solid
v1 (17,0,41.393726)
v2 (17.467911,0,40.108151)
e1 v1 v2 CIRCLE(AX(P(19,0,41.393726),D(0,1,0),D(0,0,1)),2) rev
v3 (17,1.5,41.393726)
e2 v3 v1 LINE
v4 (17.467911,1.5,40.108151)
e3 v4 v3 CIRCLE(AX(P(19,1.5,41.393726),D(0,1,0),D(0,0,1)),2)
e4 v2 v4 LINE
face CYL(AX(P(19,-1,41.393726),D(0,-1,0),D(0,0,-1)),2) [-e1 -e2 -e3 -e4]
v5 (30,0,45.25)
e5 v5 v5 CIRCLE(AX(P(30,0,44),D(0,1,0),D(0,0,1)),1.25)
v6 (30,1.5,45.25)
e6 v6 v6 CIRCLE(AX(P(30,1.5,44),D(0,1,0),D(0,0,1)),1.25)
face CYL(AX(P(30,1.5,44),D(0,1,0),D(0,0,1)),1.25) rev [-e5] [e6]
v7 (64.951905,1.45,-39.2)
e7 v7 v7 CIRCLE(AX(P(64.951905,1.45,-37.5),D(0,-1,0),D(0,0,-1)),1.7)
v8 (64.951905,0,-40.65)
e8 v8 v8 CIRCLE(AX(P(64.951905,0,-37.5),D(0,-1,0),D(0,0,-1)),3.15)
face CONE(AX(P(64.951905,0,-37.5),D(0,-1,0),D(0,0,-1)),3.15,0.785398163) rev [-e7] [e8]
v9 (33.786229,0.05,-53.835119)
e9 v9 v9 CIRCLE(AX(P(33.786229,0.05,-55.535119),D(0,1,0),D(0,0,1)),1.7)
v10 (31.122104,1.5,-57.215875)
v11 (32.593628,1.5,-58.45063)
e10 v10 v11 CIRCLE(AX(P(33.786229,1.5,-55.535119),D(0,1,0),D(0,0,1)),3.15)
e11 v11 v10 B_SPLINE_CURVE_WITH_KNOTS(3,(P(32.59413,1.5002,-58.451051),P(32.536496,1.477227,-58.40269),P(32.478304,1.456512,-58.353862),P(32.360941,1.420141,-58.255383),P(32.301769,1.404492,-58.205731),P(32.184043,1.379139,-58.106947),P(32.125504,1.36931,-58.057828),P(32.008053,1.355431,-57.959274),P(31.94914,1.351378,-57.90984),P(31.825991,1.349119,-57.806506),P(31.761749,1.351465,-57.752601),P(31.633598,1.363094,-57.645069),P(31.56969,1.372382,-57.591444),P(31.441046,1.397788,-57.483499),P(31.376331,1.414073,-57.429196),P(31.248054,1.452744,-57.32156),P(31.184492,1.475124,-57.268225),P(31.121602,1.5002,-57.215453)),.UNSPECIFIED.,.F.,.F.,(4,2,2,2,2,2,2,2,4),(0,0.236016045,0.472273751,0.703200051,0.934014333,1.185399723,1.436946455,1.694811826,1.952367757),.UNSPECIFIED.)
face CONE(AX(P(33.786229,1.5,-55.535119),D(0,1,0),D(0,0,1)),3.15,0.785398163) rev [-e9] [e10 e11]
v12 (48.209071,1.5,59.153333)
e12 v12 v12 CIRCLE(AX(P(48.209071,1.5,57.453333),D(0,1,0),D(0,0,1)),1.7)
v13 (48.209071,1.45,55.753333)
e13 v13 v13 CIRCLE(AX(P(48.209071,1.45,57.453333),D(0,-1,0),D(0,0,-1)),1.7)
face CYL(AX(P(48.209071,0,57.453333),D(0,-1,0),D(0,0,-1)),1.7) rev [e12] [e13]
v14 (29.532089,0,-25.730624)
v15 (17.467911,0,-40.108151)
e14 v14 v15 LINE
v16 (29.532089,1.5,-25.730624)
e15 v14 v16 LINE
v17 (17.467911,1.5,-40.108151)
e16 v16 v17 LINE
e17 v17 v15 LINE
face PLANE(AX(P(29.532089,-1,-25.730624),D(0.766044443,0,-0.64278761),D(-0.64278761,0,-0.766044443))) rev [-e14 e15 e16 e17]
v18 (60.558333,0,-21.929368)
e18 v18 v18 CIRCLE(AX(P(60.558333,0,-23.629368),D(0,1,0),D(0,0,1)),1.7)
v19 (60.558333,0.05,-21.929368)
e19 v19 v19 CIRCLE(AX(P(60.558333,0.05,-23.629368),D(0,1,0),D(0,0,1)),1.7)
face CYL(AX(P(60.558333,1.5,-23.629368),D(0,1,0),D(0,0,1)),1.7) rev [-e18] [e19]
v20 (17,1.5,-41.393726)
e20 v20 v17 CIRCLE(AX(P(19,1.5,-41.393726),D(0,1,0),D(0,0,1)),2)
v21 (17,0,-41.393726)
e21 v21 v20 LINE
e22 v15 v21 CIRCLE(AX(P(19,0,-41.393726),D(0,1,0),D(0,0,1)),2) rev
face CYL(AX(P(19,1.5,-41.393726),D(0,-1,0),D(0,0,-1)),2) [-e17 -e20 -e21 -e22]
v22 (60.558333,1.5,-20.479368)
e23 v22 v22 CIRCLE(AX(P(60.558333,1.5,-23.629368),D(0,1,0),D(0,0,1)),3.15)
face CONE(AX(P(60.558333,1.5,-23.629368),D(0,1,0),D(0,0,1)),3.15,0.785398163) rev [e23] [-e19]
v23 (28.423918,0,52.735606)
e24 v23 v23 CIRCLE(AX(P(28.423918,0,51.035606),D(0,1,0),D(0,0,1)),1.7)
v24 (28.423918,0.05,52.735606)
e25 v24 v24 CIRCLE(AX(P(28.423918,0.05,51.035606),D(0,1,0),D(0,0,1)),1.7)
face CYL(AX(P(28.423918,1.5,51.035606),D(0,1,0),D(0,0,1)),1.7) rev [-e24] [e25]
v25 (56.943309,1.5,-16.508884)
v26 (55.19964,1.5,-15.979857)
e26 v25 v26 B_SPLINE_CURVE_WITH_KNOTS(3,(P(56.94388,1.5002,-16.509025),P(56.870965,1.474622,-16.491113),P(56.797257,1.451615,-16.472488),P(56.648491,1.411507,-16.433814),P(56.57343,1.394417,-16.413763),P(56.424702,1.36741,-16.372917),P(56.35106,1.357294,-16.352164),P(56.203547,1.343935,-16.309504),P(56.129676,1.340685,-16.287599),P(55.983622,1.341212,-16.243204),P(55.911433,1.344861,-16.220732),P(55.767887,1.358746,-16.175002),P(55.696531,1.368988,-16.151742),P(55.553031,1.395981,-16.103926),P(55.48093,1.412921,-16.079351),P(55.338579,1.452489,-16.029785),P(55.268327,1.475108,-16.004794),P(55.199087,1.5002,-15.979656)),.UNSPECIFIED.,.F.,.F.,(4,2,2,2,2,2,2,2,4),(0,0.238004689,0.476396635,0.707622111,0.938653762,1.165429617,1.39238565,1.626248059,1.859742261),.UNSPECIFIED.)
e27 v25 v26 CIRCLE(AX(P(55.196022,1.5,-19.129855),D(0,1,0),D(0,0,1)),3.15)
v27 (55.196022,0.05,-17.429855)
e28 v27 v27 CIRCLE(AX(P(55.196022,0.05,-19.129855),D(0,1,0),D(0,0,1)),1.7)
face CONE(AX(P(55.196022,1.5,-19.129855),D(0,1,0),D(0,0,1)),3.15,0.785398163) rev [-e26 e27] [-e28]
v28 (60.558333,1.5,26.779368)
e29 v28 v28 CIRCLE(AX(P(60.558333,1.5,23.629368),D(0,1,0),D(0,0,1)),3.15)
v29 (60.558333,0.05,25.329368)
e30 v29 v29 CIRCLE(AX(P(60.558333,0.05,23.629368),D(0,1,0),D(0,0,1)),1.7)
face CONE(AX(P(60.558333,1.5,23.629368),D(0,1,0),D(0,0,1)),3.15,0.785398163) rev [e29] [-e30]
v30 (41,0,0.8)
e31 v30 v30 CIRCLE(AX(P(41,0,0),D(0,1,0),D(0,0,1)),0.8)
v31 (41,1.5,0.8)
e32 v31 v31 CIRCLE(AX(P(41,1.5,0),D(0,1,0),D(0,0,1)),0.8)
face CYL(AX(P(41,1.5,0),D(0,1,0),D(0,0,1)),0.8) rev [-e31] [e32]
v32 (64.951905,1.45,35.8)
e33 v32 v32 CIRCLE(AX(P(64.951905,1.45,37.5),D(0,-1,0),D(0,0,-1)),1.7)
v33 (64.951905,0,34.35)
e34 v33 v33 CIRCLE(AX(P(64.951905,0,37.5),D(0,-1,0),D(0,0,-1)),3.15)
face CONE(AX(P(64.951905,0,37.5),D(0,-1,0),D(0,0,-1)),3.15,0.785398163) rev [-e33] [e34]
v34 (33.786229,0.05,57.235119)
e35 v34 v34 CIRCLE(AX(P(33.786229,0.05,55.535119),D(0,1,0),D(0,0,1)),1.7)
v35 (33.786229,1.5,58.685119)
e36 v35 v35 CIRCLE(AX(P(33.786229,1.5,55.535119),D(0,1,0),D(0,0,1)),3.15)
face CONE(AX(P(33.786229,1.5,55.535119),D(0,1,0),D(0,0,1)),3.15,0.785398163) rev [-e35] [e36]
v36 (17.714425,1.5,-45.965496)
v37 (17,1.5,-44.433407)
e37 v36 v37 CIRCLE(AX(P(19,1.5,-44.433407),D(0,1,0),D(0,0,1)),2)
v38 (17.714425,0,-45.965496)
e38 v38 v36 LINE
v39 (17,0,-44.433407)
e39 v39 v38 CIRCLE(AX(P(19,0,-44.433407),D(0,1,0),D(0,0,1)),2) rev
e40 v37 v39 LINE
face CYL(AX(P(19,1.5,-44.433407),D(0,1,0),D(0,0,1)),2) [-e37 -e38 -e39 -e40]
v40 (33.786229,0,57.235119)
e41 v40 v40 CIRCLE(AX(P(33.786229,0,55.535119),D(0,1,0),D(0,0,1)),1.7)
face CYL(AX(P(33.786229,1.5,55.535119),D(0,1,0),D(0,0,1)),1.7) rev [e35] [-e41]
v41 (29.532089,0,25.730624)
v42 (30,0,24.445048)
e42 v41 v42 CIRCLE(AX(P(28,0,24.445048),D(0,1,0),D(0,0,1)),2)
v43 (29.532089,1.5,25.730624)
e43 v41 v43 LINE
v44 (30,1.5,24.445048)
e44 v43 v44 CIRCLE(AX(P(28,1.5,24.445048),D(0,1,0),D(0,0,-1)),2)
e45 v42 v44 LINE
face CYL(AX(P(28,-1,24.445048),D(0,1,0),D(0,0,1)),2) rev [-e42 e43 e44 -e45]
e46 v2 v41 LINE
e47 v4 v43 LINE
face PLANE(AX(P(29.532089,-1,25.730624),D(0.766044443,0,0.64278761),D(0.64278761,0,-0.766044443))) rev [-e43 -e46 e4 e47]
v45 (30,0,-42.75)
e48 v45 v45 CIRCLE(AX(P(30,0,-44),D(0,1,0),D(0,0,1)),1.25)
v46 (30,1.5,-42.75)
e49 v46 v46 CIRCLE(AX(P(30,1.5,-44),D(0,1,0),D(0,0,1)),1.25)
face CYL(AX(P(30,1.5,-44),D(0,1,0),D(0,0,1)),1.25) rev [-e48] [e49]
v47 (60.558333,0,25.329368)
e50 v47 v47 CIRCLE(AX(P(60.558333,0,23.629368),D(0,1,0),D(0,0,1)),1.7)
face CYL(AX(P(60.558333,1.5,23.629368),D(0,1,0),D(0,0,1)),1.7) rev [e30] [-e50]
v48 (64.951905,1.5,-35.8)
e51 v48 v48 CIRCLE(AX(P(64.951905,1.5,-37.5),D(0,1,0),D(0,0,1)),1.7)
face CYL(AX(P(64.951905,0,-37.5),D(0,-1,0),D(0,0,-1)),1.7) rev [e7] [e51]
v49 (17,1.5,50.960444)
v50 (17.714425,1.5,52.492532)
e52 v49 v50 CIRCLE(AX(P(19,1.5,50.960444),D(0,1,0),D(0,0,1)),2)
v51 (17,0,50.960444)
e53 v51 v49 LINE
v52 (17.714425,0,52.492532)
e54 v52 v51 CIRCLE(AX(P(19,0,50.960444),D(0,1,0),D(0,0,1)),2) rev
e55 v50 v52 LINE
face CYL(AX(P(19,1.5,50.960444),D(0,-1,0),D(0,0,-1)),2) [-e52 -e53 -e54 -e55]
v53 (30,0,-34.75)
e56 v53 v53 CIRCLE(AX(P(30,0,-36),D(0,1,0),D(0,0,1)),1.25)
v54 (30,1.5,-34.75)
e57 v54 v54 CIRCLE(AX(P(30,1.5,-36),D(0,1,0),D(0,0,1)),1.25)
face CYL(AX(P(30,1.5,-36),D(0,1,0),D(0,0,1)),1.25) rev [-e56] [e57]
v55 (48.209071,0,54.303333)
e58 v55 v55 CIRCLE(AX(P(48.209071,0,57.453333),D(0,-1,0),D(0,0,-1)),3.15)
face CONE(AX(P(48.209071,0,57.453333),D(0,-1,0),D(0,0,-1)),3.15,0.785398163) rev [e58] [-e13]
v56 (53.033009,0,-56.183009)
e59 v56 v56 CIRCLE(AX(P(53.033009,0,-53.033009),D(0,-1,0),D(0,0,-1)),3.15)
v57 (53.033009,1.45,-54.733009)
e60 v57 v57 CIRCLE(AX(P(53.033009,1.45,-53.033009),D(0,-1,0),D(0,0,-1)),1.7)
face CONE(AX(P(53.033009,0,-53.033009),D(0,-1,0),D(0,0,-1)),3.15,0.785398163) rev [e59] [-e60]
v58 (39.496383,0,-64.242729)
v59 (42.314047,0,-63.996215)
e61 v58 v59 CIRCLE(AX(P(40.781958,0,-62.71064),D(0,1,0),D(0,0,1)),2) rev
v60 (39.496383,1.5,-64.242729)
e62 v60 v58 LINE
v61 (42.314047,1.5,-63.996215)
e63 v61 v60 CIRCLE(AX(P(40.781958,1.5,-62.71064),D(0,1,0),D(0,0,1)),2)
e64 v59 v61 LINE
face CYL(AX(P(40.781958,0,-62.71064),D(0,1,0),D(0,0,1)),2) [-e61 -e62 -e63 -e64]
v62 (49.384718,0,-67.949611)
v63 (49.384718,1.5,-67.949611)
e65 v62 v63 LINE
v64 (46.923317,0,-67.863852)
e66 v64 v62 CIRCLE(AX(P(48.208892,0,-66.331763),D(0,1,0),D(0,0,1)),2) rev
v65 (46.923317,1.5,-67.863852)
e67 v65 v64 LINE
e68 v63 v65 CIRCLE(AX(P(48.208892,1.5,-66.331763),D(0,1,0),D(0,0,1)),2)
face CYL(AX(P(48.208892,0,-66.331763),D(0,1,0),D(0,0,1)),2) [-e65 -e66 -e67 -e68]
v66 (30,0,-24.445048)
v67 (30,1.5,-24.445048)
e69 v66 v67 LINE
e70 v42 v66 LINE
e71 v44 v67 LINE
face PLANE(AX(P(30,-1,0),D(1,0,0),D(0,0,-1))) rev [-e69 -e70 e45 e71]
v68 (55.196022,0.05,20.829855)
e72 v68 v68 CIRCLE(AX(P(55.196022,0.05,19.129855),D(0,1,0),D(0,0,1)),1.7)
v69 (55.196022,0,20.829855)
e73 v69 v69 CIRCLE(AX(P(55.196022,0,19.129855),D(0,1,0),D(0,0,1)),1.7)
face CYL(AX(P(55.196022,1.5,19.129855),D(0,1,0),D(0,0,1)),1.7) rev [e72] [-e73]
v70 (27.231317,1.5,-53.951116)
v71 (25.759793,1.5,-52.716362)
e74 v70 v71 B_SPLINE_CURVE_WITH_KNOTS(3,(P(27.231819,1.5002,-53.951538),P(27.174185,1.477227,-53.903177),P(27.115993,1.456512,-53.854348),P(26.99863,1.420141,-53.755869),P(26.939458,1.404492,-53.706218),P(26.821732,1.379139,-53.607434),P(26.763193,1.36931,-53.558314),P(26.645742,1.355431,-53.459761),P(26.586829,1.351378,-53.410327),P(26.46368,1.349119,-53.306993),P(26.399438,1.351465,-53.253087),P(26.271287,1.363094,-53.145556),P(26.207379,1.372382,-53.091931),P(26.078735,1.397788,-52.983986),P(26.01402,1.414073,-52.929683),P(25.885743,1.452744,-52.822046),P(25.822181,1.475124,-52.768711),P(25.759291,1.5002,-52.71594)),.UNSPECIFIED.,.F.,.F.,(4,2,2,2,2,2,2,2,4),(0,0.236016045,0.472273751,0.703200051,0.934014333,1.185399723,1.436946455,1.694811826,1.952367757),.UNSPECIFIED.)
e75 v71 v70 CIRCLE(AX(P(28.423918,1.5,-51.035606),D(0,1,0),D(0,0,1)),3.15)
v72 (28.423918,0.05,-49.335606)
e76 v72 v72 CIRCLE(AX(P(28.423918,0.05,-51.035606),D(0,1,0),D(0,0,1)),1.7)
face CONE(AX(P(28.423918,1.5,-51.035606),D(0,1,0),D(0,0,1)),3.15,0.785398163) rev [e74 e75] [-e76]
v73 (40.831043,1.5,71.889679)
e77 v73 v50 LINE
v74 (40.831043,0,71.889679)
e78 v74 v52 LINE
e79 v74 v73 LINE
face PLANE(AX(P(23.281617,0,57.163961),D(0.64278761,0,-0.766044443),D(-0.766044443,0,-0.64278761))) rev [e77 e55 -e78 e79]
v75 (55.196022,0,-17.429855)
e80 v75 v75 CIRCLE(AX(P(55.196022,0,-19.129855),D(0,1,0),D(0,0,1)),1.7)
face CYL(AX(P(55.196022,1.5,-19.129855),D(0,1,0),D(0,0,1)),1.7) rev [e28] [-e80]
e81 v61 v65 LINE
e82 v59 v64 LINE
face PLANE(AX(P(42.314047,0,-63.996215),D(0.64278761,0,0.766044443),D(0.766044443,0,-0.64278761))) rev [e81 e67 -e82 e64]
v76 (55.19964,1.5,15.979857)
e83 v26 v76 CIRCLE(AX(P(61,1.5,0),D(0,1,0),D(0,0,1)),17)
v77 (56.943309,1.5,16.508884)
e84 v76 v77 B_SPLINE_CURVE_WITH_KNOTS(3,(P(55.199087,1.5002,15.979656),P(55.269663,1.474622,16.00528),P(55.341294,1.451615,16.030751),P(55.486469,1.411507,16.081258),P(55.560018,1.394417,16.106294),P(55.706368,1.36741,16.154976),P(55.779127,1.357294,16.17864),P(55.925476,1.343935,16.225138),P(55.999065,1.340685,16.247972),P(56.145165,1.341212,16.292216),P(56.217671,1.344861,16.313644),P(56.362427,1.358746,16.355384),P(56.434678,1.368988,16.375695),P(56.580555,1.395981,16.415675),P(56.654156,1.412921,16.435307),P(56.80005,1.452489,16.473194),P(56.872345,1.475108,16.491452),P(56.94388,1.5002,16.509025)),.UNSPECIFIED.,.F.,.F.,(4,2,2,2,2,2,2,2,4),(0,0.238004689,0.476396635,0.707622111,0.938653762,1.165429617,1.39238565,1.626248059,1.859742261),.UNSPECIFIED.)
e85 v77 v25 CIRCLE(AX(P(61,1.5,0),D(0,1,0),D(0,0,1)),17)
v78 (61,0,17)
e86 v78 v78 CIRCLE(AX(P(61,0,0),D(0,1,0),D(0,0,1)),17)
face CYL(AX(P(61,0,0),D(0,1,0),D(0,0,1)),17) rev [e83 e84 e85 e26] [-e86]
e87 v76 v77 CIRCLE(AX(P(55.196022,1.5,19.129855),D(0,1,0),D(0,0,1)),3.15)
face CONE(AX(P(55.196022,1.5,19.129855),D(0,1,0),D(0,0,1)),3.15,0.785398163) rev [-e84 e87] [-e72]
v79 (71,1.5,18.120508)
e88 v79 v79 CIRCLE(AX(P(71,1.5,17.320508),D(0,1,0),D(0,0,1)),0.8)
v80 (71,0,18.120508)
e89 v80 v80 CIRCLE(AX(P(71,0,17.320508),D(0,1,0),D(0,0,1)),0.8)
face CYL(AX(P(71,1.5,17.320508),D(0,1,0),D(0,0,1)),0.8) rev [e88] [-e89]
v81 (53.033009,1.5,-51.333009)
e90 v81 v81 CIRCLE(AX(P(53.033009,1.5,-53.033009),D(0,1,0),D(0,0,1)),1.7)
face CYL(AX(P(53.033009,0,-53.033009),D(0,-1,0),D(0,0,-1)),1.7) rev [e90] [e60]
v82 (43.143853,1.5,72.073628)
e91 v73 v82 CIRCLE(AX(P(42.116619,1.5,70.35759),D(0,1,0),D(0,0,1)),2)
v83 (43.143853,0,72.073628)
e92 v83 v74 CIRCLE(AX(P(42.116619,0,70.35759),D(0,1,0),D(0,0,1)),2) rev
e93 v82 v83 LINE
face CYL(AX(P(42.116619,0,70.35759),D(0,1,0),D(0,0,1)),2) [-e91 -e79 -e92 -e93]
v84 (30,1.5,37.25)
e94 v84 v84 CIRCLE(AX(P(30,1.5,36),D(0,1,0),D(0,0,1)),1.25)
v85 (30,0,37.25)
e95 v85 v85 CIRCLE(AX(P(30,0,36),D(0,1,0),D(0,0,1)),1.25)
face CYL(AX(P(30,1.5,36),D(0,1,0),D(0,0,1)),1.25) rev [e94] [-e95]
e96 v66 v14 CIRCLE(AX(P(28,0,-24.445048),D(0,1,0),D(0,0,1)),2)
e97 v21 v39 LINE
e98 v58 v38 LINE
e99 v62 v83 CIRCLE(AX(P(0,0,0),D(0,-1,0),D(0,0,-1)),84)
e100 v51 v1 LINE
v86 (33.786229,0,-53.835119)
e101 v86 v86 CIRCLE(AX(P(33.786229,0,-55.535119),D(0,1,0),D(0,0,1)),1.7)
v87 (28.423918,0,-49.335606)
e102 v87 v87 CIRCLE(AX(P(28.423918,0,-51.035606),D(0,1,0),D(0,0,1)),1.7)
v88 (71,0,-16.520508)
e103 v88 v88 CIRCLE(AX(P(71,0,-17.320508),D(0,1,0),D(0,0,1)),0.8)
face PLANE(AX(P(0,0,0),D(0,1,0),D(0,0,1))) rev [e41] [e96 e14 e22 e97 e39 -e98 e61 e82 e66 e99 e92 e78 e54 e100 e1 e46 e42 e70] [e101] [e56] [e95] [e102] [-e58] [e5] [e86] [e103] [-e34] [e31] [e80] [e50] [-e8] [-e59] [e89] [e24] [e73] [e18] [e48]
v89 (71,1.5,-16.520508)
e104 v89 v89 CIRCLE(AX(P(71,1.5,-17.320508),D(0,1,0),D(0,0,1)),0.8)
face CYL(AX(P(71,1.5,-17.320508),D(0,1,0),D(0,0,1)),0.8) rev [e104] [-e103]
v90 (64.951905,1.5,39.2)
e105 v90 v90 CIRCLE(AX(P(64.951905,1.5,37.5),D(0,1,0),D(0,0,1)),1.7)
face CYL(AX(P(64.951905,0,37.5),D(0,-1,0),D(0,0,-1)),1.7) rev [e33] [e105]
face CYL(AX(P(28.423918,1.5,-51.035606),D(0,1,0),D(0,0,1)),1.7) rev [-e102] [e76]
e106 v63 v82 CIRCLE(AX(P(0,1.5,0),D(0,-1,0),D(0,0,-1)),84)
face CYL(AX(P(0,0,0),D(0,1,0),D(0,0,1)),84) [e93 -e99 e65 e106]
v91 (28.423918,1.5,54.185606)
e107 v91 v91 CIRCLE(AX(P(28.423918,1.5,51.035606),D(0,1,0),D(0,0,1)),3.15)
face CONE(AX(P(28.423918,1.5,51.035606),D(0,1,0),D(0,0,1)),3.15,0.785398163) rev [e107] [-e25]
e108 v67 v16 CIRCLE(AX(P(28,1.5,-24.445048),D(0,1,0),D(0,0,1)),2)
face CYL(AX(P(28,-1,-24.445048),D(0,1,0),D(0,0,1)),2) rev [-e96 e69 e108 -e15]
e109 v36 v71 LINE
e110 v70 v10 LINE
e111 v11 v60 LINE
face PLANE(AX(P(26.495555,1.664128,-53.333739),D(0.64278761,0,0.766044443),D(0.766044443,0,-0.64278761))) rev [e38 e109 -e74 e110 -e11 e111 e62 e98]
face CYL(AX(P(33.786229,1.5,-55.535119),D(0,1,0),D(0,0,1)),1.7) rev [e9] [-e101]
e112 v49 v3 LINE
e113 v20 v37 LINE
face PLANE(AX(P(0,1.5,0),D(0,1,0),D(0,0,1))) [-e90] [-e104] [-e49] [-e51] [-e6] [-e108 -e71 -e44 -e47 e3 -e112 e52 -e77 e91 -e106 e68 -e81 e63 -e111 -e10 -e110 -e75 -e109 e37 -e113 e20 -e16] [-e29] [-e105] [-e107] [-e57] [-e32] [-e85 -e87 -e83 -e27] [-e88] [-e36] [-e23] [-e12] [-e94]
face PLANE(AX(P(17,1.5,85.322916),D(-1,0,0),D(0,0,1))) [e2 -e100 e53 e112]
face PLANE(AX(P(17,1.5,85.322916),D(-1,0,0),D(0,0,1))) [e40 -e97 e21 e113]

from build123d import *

# Parameters (mm, degrees)
RESSALTO_EXTRUS_O1_DEPTH                           = 1.5
ESBO_O2_R                                          = 17
CORTE_EXTRUS_O1_DEPTH                              = 122.865704774
FURO_ROSCADO_DE_M21_D                              = 1.6
CORTE_EXTRUS_O2_DEPTH                              = 2.5
ESCAREADO_PARA_PARAFUSO_COM_CABE_A_E_2_COUNT       = 2
ESCAREADO_PARA_PARAFUSO_COM_CABE_A_E_2_PITCH       = 7
ESCAREADO_PARA_PARAFUSO_COM_CABE_A_E_3_COUNT       = 2
ESCAREADO_PARA_PARAFUSO_COM_CABE_A_E_3_PITCH       = 41.65
ESCAREADO_PARA_PARAFUSO_COM_CABE_A_E_4_COUNT       = 2
ESCAREADO_PARA_PARAFUSO_COM_CABE_A_E_4_PITCH       = 42.234139035
ESCAREADO_PARA_PARAFUSO_COM_CABE_A_E_5_A_COUNT     = 2
ESCAREADO_PARA_PARAFUSO_COM_CABE_A_E_5_A_PITCH     = 7
ESCAREADO_PARA_PARAFUSO_COM_CABE_A_E_6_COUNT       = 2
ESCAREADO_PARA_PARAFUSO_COM_CABE_A_E_6_PITCH       = 41.65
ESCAREADO_PARA_PARAFUSO_COM_CABE_A_E_7_COUNT       = 2
ESCAREADO_PARA_PARAFUSO_COM_CABE_A_E_7_PITCH       = 42.234139035
ESCAREADO_PARA_PARAFUSO_COM_CABE_A_E_8_D           = 3.4
ESCAREADO_PARA_PARAFUSO_COM_CABE_A_E_8_DEPTH       = 7.25
ESCAREADO_PARA_PARAFUSO_COM_CABE_A_E_8_CSINK_D     = 6.3
ESCAREADO_PARA_PARAFUSO_COM_CABE_A_E_8_CSINK_ANGLE = 90
ESCAREADO_PARA_PARAFUSO_COM_CABE_A_E_8_TIP         = 1.021463052
CORTE_EXTRUS_O3_DEPTH                              = 122.865704775
CORTE_EXTRUS_O4_DEPTH                              = 122.865704775
CORTE_EXTRUS_O5_DEPTH                              = 115.773877222
CORTE_EXTRUS_O6_DEPTH                              = 112.164853797
FILETE2_R                                          = 2
BROCA_DE_ROSQUEAR_PARA_TARRAXA_DE_M31_D            = 2.5


with BuildPart() as part:
    # Esboço1 → Ressalto-extrusão1 (new body)
    with BuildSketch(Plane(origin=(0, 0, 0), x_dir=(1, 0, 0), z_dir=(0, 1, 0))):
        with BuildLine():
            Line((17, -85.322916031), (17, 85.322916031))
            ThreePointArc((17, 85.322916031), (87, 0), (17, -85.322916031))
        make_face()
    extrude(amount=RESSALTO_EXTRUS_O1_DEPTH)

    # Esboço2 → Corte-extrusão1 (cut, through all)
    with BuildSketch(Plane(origin=(0, 1.5, 0), x_dir=(1, 0, 0), z_dir=(0, 1, 0))):
        with Locations(Location((61, 0, 0), (0, 0, 270))):
            Circle(ESBO_O2_R)
    extrude(amount=-CORTE_EXTRUS_O1_DEPTH, mode=Mode.SUBTRACT)

    # Furo roscado de M21 (through all)
    with Locations(Plane(origin=(71, 1.5, 17.320508076), x_dir=(0, 0, 1), z_dir=(0, 1, 0))):
        with Locations((0, 0), (-17.320508076, -30), (-34.641016152, 0)):
            Hole(FURO_ROSCADO_DE_M21_D / 2)

    # Esboço4 → Corte-extrusão2 (cut)
    with BuildSketch(Plane(origin=(0, 1.5, 0), x_dir=(1, 0, 0), z_dir=(0, 1, 0))):
        with BuildLine():
            Line((30, 0), (30, 24.445048467))
            ThreePointArc((30, 24.445048467), (29.879385242, 25.129088753), (29.532088886, 25.730623686))
            Line((29.532088886, 25.730623686), (17, 40.665785639))
            Line((17, 40.665785639), (17, -40.665785639))
            Line((17, -40.665785639), (29.532088886, -25.730623686))
            ThreePointArc((29.532088886, -25.730623686), (29.879385242, -25.129088753), (30, -24.445048467))
            Line((30, -24.445048467), (30, 0))
        make_face()
    extrude(amount=-CORTE_EXTRUS_O2_DEPTH, mode=Mode.SUBTRACT)

    # Esboço6 → Escareado para parafuso com cabe_a escar (revolve, cut)
    with BuildSketch(Plane(origin=(33.786228885, 1.5, -55.535118997), x_dir=(0, 0, 1), z_dir=(1, 0, 0))):
        Polygon((0, 0), (0, 1.5), (1.7, 1.5), (1.7, 1.45), (3.15, 0), align=None)
    escareado_para_parafuso_com_cabe_a_escar = revolve(axis=Axis((33.786228885, 7.85, -55.535118997), (0, -1, 0)), mode=Mode.SUBTRACT)

    # Escareado para parafuso com cabe_a e 2: Escareado para parafuso com cabe_a escar ×2
    with Locations(*[Vector(-0.7660444431189771, 0, 0.6427876096865406) * (i * ESCAREADO_PARA_PARAFUSO_COM_CABE_A_E_2_PITCH) for i in range(1, ESCAREADO_PARA_PARAFUSO_COM_CABE_A_E_2_COUNT)]):
        add(escareado_para_parafuso_com_cabe_a_escar, mode=Mode.SUBTRACT)

    # Escareado para parafuso com cabe_a e 3: Escareado para parafuso com cabe_a escar ×2
    with Locations(*[Vector(0.642787609686541, 0, 0.7660444431189767) * (i * ESCAREADO_PARA_PARAFUSO_COM_CABE_A_E_3_PITCH) for i in range(1, ESCAREADO_PARA_PARAFUSO_COM_CABE_A_E_3_COUNT)]):
        add(escareado_para_parafuso_com_cabe_a_escar, mode=Mode.SUBTRACT)

    # Escareado para parafuso com cabe_a e 4: Escareado para parafuso com cabe_a escar ×2
    with Locations(*[Vector(0.5069309646406032, 0, 0.8619866571406704) * (i * ESCAREADO_PARA_PARAFUSO_COM_CABE_A_E_4_PITCH) for i in range(1, ESCAREADO_PARA_PARAFUSO_COM_CABE_A_E_4_COUNT)]):
        add(escareado_para_parafuso_com_cabe_a_escar, mode=Mode.SUBTRACT)

    # Esboço7 → Escareado para parafuso com cabe_a e 5 (revolve, cut)
    with BuildSketch(Plane(origin=(55.196021727, 1.5, 19.129854673), x_dir=(0, 0, 1), z_dir=(1, 0, 0))):
        Polygon((0, 0), (0, 1.5), (1.7, 1.5), (1.7, 1.45), (3.15, 0), align=None)
    escareado_para_parafuso_com_cabe_a_e_5 = revolve(axis=Axis((55.196021727, 7.85, 19.129854673), (0, -1, 0)), mode=Mode.SUBTRACT)

    # Escareado para parafuso com cabe_a e 5 a: Escareado para parafuso com cabe_a e 5 ×2
    with Locations(*[Vector(0.7660444431189781, 0, 0.6427876096865394) * (i * ESCAREADO_PARA_PARAFUSO_COM_CABE_A_E_5_A_PITCH) for i in range(1, ESCAREADO_PARA_PARAFUSO_COM_CABE_A_E_5_A_COUNT)]):
        add(escareado_para_parafuso_com_cabe_a_e_5, mode=Mode.SUBTRACT)

    # Escareado para parafuso com cabe_a e 6: Escareado para parafuso com cabe_a e 5 ×2
    with Locations(*[Vector(-0.64278760968654, 0, 0.7660444431189776) * (i * ESCAREADO_PARA_PARAFUSO_COM_CABE_A_E_6_PITCH) for i in range(1, ESCAREADO_PARA_PARAFUSO_COM_CABE_A_E_6_COUNT)]):
        add(escareado_para_parafuso_com_cabe_a_e_5, mode=Mode.SUBTRACT)

    # Escareado para parafuso com cabe_a e 7: Escareado para parafuso com cabe_a e 5 ×2
    with Locations(*[Vector(-0.5069309646406018, 0, 0.8619866571406711) * (i * ESCAREADO_PARA_PARAFUSO_COM_CABE_A_E_7_PITCH) for i in range(1, ESCAREADO_PARA_PARAFUSO_COM_CABE_A_E_7_COUNT)]):
        add(escareado_para_parafuso_com_cabe_a_e_5, mode=Mode.SUBTRACT)

    # Escareado para parafuso com cabe_a e 8
    with Locations(Plane(origin=(48.209070726, 0, 57.453333234), x_dir=(0, 0, -1), z_dir=(0, -1, 0))):
        with Locations((0, 0), (19.953333234, 16.742834558), (94.953333234, 16.742834558), (110.486341823, 4.823937863)):
            CounterSinkHole(ESCAREADO_PARA_PARAFUSO_COM_CABE_A_E_8_D / 2, ESCAREADO_PARA_PARAFUSO_COM_CABE_A_E_8_CSINK_D / 2, depth=ESCAREADO_PARA_PARAFUSO_COM_CABE_A_E_8_DEPTH, counter_sink_angle=ESCAREADO_PARA_PARAFUSO_COM_CABE_A_E_8_CSINK_ANGLE)
            with Locations((0, 0, -(ESCAREADO_PARA_PARAFUSO_COM_CABE_A_E_8_DEPTH + ESCAREADO_PARA_PARAFUSO_COM_CABE_A_E_8_TIP / 2))):  # 118° drill point
                Cone(0, ESCAREADO_PARA_PARAFUSO_COM_CABE_A_E_8_D / 2, ESCAREADO_PARA_PARAFUSO_COM_CABE_A_E_8_TIP, mode=Mode.SUBTRACT)

    # Esboço17 → Corte-extrusão3 (cut, through all)
    with BuildSketch(Plane.XZ):
        Polygon((26.495554955, -53.333739059), (17, -45.366022398), (17, -85.322916031), (48.78373029, -85.322916031), (48.78373029, -72.035738762), align=None)
    extrude(amount=-CORTE_EXTRUS_O3_DEPTH, mode=Mode.SUBTRACT)

    # Esboço18 → Corte-extrusão4 (cut, through all)
    with BuildSketch(Plane(origin=(0, 1.5, 0), x_dir=(1, 0, 0), z_dir=(0, 1, 0))):
        Polygon((23.281616906, -57.163961274), (17, -51.893058845), (17, -85.322916031), (56.840152401, -85.322916031), align=None)
    extrude(amount=-CORTE_EXTRUS_O4_DEPTH, mode=Mode.SUBTRACT)

    # Esboço19 → Corte-extrusão5 (cut, through all)
    with BuildSketch(Plane(origin=(0, 1.5, 0), x_dir=(1, 0, 0), z_dir=(0, 1, 0))):
        with BuildLine():
            Line((48.78373029, 72.035738762), (46.390783088, 70.027817648))
            ThreePointArc((46.390783088, 70.027817648), (83.958731282, -2.632763095), (41.91211377, -72.796804321))
            Line((41.91211377, -72.796804321), (44.35320854, -74.845126042))
            ThreePointArc((44.35320854, -74.845126042), (86.960447647, -2.623079291), (48.78373029, 72.035738762))
        make_face()
    extrude(amount=-CORTE_EXTRUS_O5_DEPTH, mode=Mode.SUBTRACT)

    # Esboço20 → Corte-extrusão6 (cut, through all)
    with BuildSketch(Plane(origin=(0, 1.5, 0), x_dir=(1, 0, 0), z_dir=(0, 1, 0))):
        Polygon((41.028471986, 65.52830438), (42.314047206, 63.996215494), (48.108978901, 68.858740542), (46.823403682, 70.390829428), align=None)
    extrude(amount=-CORTE_EXTRUS_O6_DEPTH, mode=Mode.SUBTRACT)

    # Filete2
    filete2_edges = [part.edges().sort_by_distance(p)[0] for p in [
        (17, 0.75, 40.665785639),
        (17, 0.75, 51.893058845),
        (41.91211377, 0.75, 72.796804321),
        (48.108978901, 0.75, -68.858740542),
        (41.028471986, 0.75, -65.52830438),
        (17, 0.75, -40.665785639),
        (17, 0.75, -45.366022398),
    ]]
    fillet(filete2_edges, radius=FILETE2_R - 0.0001)  # a hair under: the kernel refuses the full size

    # Broca de rosquear para tarraxa de M31 (through all)
    with Locations(Plane(origin=(30, 1.5, 44), x_dir=(0, 0, 1), z_dir=(0, 1, 0))):
        with Locations((0, 0), (-8, 0), (-88, 0), (-80, 0)):
            Hole(BROCA_DE_ROSQUEAR_PARA_TARRAXA_DE_M31_D / 2)


solid = part.part
